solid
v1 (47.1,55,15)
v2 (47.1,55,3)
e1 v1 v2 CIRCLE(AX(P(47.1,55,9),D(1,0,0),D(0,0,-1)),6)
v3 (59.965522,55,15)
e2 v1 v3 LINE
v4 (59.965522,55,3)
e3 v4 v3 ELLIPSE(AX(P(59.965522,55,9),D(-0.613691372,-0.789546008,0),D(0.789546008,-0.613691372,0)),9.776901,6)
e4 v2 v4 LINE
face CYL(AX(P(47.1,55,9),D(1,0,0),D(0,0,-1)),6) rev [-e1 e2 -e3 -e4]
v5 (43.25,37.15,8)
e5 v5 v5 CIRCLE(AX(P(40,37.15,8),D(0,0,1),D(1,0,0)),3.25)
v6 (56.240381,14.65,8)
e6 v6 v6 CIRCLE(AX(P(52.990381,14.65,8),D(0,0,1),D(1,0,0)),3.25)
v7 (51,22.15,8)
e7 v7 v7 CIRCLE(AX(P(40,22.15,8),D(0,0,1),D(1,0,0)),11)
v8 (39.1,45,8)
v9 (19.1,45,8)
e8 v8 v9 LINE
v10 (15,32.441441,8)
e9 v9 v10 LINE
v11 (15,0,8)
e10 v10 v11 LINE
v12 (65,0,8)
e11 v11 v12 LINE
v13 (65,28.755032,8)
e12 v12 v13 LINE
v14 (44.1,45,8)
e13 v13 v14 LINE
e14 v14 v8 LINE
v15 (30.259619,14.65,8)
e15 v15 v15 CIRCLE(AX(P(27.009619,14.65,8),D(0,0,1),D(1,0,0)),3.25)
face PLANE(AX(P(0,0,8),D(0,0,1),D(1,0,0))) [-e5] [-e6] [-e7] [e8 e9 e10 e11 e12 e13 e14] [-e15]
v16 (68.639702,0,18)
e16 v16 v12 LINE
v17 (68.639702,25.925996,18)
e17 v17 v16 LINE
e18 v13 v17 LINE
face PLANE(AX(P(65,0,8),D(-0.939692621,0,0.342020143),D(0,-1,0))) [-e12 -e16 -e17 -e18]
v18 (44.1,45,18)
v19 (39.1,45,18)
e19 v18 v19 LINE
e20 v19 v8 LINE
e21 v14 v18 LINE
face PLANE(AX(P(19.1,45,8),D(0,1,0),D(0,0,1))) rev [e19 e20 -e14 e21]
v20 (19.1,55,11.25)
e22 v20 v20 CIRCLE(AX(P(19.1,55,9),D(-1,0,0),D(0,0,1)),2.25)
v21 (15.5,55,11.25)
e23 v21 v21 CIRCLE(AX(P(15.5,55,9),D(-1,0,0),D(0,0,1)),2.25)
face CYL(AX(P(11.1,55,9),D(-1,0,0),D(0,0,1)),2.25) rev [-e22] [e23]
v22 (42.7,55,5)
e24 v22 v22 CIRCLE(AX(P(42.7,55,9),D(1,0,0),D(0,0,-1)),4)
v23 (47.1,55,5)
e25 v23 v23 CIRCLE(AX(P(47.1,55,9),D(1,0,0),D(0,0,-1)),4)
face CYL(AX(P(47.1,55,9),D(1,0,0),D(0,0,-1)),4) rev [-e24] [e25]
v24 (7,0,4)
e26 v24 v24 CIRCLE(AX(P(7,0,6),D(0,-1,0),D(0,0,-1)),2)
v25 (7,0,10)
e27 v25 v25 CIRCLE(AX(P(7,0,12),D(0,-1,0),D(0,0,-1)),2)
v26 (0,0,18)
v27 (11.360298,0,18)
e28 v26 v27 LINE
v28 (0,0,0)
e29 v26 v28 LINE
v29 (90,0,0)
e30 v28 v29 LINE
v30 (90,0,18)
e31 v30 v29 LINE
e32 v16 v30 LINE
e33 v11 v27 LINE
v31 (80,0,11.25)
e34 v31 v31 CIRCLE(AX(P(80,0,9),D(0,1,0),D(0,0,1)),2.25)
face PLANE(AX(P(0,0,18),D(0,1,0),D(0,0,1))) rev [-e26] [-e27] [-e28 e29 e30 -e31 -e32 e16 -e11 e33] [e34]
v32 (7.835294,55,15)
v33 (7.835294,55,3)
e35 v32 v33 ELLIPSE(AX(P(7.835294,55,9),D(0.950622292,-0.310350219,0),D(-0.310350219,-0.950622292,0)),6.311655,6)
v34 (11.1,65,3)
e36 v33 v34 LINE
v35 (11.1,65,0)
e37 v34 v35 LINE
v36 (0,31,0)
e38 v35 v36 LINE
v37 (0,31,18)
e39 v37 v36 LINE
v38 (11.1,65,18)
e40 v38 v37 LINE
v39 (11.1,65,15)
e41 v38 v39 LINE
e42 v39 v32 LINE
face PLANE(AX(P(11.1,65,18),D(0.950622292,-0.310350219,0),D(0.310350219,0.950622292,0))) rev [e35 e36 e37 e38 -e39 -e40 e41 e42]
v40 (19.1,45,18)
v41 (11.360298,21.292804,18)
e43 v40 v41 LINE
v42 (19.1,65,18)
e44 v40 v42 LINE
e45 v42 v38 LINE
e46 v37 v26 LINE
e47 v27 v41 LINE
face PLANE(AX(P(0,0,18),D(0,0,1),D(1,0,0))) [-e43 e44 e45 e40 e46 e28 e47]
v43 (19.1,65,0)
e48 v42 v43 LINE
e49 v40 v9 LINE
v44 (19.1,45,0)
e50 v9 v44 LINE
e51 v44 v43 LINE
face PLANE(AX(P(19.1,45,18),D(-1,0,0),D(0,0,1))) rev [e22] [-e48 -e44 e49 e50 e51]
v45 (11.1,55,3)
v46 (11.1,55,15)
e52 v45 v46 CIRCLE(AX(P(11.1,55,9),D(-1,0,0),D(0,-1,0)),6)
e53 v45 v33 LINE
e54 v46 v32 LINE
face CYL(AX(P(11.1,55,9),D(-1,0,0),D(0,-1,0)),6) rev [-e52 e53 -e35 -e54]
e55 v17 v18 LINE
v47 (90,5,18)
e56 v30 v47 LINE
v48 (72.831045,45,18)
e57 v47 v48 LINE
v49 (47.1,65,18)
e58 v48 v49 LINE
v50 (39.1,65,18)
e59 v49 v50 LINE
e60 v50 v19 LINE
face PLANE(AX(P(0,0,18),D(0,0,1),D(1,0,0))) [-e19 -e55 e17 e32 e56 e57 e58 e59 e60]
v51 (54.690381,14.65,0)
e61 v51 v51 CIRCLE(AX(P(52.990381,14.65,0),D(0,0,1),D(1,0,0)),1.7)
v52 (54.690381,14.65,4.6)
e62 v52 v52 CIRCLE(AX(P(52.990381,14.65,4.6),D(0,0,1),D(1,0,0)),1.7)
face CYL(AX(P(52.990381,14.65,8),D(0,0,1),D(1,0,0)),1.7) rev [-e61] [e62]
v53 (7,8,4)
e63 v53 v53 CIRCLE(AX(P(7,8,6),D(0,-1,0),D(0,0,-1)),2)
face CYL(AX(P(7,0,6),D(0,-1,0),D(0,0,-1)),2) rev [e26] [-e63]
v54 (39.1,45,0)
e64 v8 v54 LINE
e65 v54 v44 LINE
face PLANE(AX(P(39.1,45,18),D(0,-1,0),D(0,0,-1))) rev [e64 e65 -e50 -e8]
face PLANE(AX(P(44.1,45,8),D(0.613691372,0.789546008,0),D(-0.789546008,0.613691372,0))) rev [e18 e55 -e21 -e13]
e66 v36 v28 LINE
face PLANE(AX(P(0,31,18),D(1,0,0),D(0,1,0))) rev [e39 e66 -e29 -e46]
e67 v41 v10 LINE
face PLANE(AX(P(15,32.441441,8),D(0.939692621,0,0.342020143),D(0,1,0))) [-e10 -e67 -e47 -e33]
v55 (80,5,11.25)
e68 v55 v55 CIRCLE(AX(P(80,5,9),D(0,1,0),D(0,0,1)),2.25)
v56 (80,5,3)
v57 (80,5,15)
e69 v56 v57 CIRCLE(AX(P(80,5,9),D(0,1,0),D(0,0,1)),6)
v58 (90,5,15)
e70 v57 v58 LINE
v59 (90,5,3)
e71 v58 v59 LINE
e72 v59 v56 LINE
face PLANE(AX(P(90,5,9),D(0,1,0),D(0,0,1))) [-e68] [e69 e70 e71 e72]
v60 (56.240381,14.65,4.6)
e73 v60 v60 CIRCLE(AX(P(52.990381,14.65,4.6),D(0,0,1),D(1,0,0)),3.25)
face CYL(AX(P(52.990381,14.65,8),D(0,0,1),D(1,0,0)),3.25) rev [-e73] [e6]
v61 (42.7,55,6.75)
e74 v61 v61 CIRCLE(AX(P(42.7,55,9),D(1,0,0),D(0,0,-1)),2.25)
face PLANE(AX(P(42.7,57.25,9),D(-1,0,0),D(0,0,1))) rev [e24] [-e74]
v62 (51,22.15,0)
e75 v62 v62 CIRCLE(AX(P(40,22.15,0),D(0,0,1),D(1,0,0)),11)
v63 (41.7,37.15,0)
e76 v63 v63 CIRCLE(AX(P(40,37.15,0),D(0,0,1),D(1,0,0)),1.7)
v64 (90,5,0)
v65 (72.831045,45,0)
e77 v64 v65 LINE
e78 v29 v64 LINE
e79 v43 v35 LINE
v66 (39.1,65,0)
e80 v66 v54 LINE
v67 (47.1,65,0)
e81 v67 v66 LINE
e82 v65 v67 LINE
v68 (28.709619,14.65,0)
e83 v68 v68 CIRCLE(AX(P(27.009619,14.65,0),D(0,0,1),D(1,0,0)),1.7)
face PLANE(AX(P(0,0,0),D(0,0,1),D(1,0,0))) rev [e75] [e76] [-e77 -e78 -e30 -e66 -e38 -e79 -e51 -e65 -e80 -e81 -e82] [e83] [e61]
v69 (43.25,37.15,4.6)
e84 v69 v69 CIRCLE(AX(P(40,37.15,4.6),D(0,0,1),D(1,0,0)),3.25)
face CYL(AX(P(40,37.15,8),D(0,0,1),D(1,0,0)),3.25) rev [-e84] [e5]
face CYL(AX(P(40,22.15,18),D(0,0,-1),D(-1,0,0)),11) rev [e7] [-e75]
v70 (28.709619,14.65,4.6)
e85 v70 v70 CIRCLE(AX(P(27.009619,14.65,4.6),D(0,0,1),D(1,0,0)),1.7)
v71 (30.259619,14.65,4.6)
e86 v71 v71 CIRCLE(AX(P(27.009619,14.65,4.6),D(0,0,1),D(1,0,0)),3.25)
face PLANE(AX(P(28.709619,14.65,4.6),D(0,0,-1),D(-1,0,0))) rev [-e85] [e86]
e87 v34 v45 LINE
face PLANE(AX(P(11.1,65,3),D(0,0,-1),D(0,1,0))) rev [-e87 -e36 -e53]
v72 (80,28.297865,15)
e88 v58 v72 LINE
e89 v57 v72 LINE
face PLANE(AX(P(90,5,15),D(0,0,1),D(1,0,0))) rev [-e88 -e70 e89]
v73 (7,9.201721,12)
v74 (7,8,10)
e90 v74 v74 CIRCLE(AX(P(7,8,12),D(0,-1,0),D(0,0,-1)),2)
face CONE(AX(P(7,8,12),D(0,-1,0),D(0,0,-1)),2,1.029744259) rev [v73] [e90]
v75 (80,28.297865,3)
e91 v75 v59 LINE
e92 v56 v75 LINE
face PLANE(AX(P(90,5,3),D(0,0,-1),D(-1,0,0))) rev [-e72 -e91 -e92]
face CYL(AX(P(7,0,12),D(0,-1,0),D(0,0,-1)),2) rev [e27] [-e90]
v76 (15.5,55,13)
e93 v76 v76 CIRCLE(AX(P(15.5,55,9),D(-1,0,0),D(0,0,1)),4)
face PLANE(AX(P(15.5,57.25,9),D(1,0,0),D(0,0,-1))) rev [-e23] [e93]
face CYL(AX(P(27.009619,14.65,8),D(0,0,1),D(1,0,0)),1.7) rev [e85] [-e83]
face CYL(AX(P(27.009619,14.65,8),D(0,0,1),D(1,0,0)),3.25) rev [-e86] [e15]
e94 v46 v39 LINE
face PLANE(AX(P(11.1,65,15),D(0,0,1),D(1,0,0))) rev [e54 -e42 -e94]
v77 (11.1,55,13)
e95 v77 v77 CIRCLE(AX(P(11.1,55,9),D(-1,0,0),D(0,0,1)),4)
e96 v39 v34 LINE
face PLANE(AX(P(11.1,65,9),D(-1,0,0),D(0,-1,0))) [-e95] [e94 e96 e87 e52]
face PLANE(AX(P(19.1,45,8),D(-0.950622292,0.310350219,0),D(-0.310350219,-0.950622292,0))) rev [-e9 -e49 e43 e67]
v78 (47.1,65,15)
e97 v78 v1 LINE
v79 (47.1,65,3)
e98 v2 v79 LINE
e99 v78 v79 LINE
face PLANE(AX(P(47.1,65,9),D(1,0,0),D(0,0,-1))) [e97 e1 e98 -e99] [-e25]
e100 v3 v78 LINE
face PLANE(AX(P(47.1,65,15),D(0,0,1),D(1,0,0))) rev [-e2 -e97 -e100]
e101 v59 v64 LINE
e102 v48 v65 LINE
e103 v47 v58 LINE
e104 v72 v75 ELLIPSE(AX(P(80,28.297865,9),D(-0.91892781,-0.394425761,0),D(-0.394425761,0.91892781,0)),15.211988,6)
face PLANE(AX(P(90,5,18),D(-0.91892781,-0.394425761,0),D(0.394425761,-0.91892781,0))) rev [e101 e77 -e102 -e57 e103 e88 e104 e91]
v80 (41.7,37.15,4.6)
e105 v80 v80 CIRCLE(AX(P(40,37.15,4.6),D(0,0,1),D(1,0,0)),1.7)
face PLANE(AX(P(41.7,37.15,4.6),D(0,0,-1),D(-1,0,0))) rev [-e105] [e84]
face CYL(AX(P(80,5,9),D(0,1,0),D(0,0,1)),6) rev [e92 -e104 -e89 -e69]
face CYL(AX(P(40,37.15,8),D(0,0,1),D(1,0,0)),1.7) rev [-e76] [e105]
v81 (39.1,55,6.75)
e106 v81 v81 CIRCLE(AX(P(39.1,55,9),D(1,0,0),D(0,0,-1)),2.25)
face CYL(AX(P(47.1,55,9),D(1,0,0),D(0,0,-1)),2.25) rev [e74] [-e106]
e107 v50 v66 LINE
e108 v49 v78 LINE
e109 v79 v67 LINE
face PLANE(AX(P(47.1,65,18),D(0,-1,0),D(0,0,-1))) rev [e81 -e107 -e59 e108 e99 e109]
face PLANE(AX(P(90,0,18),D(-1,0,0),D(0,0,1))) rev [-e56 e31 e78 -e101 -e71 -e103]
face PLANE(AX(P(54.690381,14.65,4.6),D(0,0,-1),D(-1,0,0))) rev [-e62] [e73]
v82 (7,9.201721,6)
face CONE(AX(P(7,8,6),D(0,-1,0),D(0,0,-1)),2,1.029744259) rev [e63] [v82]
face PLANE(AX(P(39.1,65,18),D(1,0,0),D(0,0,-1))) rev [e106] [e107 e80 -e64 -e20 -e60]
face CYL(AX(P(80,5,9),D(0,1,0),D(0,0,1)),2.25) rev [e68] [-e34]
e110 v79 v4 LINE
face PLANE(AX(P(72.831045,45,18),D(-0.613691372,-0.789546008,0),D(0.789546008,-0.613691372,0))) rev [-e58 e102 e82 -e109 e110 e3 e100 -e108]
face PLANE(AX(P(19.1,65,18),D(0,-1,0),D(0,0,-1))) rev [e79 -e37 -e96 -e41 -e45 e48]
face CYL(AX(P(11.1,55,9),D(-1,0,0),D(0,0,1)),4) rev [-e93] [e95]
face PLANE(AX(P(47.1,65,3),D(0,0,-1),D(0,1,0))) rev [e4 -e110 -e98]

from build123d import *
from OCP.BRepFilletAPI import BRepFilletAPI_MakeChamfer

# Parameters (mm, degrees)
SKETCH1_R                                           = 11
BOSS_EXTRUDE1_DEPTH                                 = 18
CUT_EXTRUDE4_DEPTH                                  = 60
CUT_EXTRUDE5_DEPTH                                  = 10
CHAMFER1_SIZE                                       = 3.639702343
CHAMFER1_SIZE_2                                     = 10
CUT_EXTRUDE6_DEPTH                                  = 42.9
CUT_EXTRUDE7_START                                  = -11.1
CUT_EXTRUDE7_DEPTH                                  = 11.1
CBORE_FOR_M3_HEX_SOCKET_HEAD_CAP_SCREW2_D           = 3.4
CBORE_FOR_M3_HEX_SOCKET_HEAD_CAP_SCREW2_DEPTH       = 8
CBORE_FOR_M3_HEX_SOCKET_HEAD_CAP_SCREW2_CBORE_D     = 6.5
CBORE_FOR_M3_HEX_SOCKET_HEAD_CAP_SCREW2_CBORE_DEPTH = 3.4
CBORE_FOR_M3_HEX_SOCKET_HEAD_CAP_SCREW2_TIP         = 1.021463052
CBORE_FOR_M4_HEX_SOCKET_HEAD_CAP_SCREW1_D           = 4.5
CBORE_FOR_M4_HEX_SOCKET_HEAD_CAP_SCREW1_DEPTH       = 8
CBORE_FOR_M4_HEX_SOCKET_HEAD_CAP_SCREW1_CBORE_D     = 8
CBORE_FOR_M4_HEX_SOCKET_HEAD_CAP_SCREW1_CBORE_DEPTH = 4.4
CBORE_FOR_M4_HEX_SOCKET_HEAD_CAP_SCREW1_TIP         = 1.351936393
CBORE_FOR_M4_HEX_SOCKET_HEAD_CAP_SCREW2_D           = 4.5
CBORE_FOR_M4_HEX_SOCKET_HEAD_CAP_SCREW2_DEPTH       = 8
CBORE_FOR_M4_HEX_SOCKET_HEAD_CAP_SCREW2_CBORE_D     = 8
CBORE_FOR_M4_HEX_SOCKET_HEAD_CAP_SCREW2_CBORE_DEPTH = 4.4
CBORE_FOR_M4_HEX_SOCKET_HEAD_CAP_SCREW2_TIP         = 1.351936393
M4_CLEARANCE_HOLE1_D                                = 4.5
M4_CLEARANCE_HOLE1_DEPTH                            = 8
M4_CLEARANCE_HOLE1_TIP                              = 1.351936393
F_4_0MM_DOWEL_HOLE1_D                               = 4
F_4_0MM_DOWEL_HOLE1_DEPTH                           = 8
F_4_0MM_DOWEL_HOLE1_TIP                             = 1.201721238


with BuildPart() as part:
    # Sketch1 → Boss-Extrude1 (new body)
    with BuildSketch(Plane.XY):
        Polygon((39.1, 65), (39.1, 45), (19.1, 45), (19.1, 65), (11.1, 65), (0, 31), (0, 0), (90, 0), (90, 5), (72.831044759, 45), (47.1, 65), align=None)
        with Locations((40, 22.15)):
            Circle(SKETCH1_R, mode=Mode.SUBTRACT)
    extrude(amount=BOSS_EXTRUDE1_DEPTH)

    # Sketch5 → Cut-Extrude4 (cut)
    with BuildSketch(Plane(origin=(0, 65, 0), x_dir=(1, 0, 0), z_dir=(0, 1, 0))):
        with BuildLine():
            Line((90, -15), (80, -15))
            ThreePointArc((80, -15), (74, -9), (80, -3))
            Line((80, -3), (90, -3))
            ThreePointArc((90, -3), (96, -9), (90, -15))
        make_face()
    extrude(amount=-CUT_EXTRUDE4_DEPTH, mode=Mode.SUBTRACT)

    # Sketch6 → Cut-Extrude5 (cut)
    with BuildSketch(Plane.XY.offset(18)):
        Polygon((19.1, 45), (15, 32.441441441), (15, 0), (65, 0), (65, 28.75503195), (44.1, 45), align=None)
    extrude(amount=-CUT_EXTRUDE5_DEPTH, mode=Mode.SUBTRACT)

    # Chamfer1
    chamfer1_edges_1 = [part.edges().sort_by_distance(p)[0] for p in [
        (15, 16.220720721, 18),
    ]]
    chamfer1_side_1 = [part.faces().sort_by_distance(p)[0] for p in [
        (14.927205953, 16.220720721, 18),
    ]]
    chamfer1_edges_2 = [part.edges().sort_by_distance(p)[0] for p in [
        (65, 14.377515975, 18),
    ]]
    chamfer1_side_2 = [part.faces().sort_by_distance(p)[0] for p in [
        (65.072794047, 14.377515975, 18),
    ]]
    chamfer1 = BRepFilletAPI_MakeChamfer(part.part.solid().wrapped)
    for e in chamfer1_edges_1:
        chamfer1.Add(CHAMFER1_SIZE - 0.0001, CHAMFER1_SIZE_2 - 0.0001, e.wrapped, chamfer1_side_1[0].wrapped)
    for e in chamfer1_edges_2:
        chamfer1.Add(CHAMFER1_SIZE - 0.0001, CHAMFER1_SIZE_2 - 0.0001, e.wrapped, chamfer1_side_2[0].wrapped)
    add(Compound.cast(chamfer1.Shape()), mode=Mode.REPLACE)  # a hair under: the kernel refuses the full size

    # Sketch7 → Cut-Extrude6 (cut)
    with BuildSketch(Plane(origin=(90, 0, 0), x_dir=(0, 0, -1), z_dir=(1, 0, 0))):
        with BuildLine():
            Line((-3, 65), (-3, 55))
            ThreePointArc((-3, 55), (-9, 49), (-15, 55))
            Line((-15, 55), (-15, 65))
            ThreePointArc((-15, 65), (-9, 71), (-3, 65))
        make_face()
    extrude(amount=-CUT_EXTRUDE6_DEPTH, mode=Mode.SUBTRACT)

    # Sketch8 → Cut-Extrude7 (cut)
    with BuildSketch(Plane.ZY.offset(CUT_EXTRUDE7_START)):
        with BuildLine():
            Line((15, 65), (15, 55))
            ThreePointArc((15, 55), (9, 49), (3, 55))
            Line((3, 55), (3, 65))
            ThreePointArc((3, 65), (9, 71), (15, 65))
        make_face()
    extrude(amount=CUT_EXTRUDE7_DEPTH, mode=Mode.SUBTRACT)

    # CBORE for M3 Hex Socket Head Cap Screw2
    with Locations(Plane.XY.offset(8)):
        with Locations((40, 37.15), (52.990381057, 14.65), (27.009618943, 14.65)):
            CounterBoreHole(CBORE_FOR_M3_HEX_SOCKET_HEAD_CAP_SCREW2_D / 2, CBORE_FOR_M3_HEX_SOCKET_HEAD_CAP_SCREW2_CBORE_D / 2, CBORE_FOR_M3_HEX_SOCKET_HEAD_CAP_SCREW2_CBORE_DEPTH, depth=CBORE_FOR_M3_HEX_SOCKET_HEAD_CAP_SCREW2_DEPTH)
            with Locations((0, 0, -(CBORE_FOR_M3_HEX_SOCKET_HEAD_CAP_SCREW2_DEPTH + CBORE_FOR_M3_HEX_SOCKET_HEAD_CAP_SCREW2_TIP / 2))):  # 118° drill point
                Cone(0, CBORE_FOR_M3_HEX_SOCKET_HEAD_CAP_SCREW2_D / 2, CBORE_FOR_M3_HEX_SOCKET_HEAD_CAP_SCREW2_TIP, mode=Mode.SUBTRACT)

    # CBORE for M4 Hex Socket Head Cap Screw1
    with Locations(Plane(origin=(47.1, 0, 0), x_dir=(0, 0, -1), z_dir=(1, 0, 0))):
        with Locations((-9, 55)):
            CounterBoreHole(CBORE_FOR_M4_HEX_SOCKET_HEAD_CAP_SCREW1_D / 2, CBORE_FOR_M4_HEX_SOCKET_HEAD_CAP_SCREW1_CBORE_D / 2, CBORE_FOR_M4_HEX_SOCKET_HEAD_CAP_SCREW1_CBORE_DEPTH, depth=CBORE_FOR_M4_HEX_SOCKET_HEAD_CAP_SCREW1_DEPTH)
            with Locations((0, 0, -(CBORE_FOR_M4_HEX_SOCKET_HEAD_CAP_SCREW1_DEPTH + CBORE_FOR_M4_HEX_SOCKET_HEAD_CAP_SCREW1_TIP / 2))):  # 118° drill point
                Cone(0, CBORE_FOR_M4_HEX_SOCKET_HEAD_CAP_SCREW1_D / 2, CBORE_FOR_M4_HEX_SOCKET_HEAD_CAP_SCREW1_TIP, mode=Mode.SUBTRACT)

    # CBORE for M4 Hex Socket Head Cap Screw2
    with Locations(Plane.ZY.offset(-11.1)):
        with Locations((9, 55)):
            CounterBoreHole(CBORE_FOR_M4_HEX_SOCKET_HEAD_CAP_SCREW2_D / 2, CBORE_FOR_M4_HEX_SOCKET_HEAD_CAP_SCREW2_CBORE_D / 2, CBORE_FOR_M4_HEX_SOCKET_HEAD_CAP_SCREW2_CBORE_DEPTH, depth=CBORE_FOR_M4_HEX_SOCKET_HEAD_CAP_SCREW2_DEPTH)
            with Locations((0, 0, -(CBORE_FOR_M4_HEX_SOCKET_HEAD_CAP_SCREW2_DEPTH + CBORE_FOR_M4_HEX_SOCKET_HEAD_CAP_SCREW2_TIP / 2))):  # 118° drill point
                Cone(0, CBORE_FOR_M4_HEX_SOCKET_HEAD_CAP_SCREW2_D / 2, CBORE_FOR_M4_HEX_SOCKET_HEAD_CAP_SCREW2_TIP, mode=Mode.SUBTRACT)

    # M4 Clearance Hole1
    with Locations(Plane(origin=(0, 5, 0), x_dir=(1, 0, 0), z_dir=(0, 1, 0))):
        with Locations((80, -9)):
            Hole(M4_CLEARANCE_HOLE1_D / 2, depth=M4_CLEARANCE_HOLE1_DEPTH)
            with Locations((0, 0, -(M4_CLEARANCE_HOLE1_DEPTH + M4_CLEARANCE_HOLE1_TIP / 2))):  # 118° drill point
                Cone(0, M4_CLEARANCE_HOLE1_D / 2, M4_CLEARANCE_HOLE1_TIP, mode=Mode.SUBTRACT)

    # Ø4.0mm Dowel Hole1
    with Locations(Plane(origin=(0, 0, 0), x_dir=(-1, 0, 0), z_dir=(0, -1, 0))):
        with Locations((-7, -12), (-7, -6)):
            Hole(F_4_0MM_DOWEL_HOLE1_D / 2, depth=F_4_0MM_DOWEL_HOLE1_DEPTH)
            with Locations((0, 0, -(F_4_0MM_DOWEL_HOLE1_DEPTH + F_4_0MM_DOWEL_HOLE1_TIP / 2))):  # 118° drill point
                Cone(0, F_4_0MM_DOWEL_HOLE1_D / 2, F_4_0MM_DOWEL_HOLE1_TIP, mode=Mode.SUBTRACT)


solid = part.part
